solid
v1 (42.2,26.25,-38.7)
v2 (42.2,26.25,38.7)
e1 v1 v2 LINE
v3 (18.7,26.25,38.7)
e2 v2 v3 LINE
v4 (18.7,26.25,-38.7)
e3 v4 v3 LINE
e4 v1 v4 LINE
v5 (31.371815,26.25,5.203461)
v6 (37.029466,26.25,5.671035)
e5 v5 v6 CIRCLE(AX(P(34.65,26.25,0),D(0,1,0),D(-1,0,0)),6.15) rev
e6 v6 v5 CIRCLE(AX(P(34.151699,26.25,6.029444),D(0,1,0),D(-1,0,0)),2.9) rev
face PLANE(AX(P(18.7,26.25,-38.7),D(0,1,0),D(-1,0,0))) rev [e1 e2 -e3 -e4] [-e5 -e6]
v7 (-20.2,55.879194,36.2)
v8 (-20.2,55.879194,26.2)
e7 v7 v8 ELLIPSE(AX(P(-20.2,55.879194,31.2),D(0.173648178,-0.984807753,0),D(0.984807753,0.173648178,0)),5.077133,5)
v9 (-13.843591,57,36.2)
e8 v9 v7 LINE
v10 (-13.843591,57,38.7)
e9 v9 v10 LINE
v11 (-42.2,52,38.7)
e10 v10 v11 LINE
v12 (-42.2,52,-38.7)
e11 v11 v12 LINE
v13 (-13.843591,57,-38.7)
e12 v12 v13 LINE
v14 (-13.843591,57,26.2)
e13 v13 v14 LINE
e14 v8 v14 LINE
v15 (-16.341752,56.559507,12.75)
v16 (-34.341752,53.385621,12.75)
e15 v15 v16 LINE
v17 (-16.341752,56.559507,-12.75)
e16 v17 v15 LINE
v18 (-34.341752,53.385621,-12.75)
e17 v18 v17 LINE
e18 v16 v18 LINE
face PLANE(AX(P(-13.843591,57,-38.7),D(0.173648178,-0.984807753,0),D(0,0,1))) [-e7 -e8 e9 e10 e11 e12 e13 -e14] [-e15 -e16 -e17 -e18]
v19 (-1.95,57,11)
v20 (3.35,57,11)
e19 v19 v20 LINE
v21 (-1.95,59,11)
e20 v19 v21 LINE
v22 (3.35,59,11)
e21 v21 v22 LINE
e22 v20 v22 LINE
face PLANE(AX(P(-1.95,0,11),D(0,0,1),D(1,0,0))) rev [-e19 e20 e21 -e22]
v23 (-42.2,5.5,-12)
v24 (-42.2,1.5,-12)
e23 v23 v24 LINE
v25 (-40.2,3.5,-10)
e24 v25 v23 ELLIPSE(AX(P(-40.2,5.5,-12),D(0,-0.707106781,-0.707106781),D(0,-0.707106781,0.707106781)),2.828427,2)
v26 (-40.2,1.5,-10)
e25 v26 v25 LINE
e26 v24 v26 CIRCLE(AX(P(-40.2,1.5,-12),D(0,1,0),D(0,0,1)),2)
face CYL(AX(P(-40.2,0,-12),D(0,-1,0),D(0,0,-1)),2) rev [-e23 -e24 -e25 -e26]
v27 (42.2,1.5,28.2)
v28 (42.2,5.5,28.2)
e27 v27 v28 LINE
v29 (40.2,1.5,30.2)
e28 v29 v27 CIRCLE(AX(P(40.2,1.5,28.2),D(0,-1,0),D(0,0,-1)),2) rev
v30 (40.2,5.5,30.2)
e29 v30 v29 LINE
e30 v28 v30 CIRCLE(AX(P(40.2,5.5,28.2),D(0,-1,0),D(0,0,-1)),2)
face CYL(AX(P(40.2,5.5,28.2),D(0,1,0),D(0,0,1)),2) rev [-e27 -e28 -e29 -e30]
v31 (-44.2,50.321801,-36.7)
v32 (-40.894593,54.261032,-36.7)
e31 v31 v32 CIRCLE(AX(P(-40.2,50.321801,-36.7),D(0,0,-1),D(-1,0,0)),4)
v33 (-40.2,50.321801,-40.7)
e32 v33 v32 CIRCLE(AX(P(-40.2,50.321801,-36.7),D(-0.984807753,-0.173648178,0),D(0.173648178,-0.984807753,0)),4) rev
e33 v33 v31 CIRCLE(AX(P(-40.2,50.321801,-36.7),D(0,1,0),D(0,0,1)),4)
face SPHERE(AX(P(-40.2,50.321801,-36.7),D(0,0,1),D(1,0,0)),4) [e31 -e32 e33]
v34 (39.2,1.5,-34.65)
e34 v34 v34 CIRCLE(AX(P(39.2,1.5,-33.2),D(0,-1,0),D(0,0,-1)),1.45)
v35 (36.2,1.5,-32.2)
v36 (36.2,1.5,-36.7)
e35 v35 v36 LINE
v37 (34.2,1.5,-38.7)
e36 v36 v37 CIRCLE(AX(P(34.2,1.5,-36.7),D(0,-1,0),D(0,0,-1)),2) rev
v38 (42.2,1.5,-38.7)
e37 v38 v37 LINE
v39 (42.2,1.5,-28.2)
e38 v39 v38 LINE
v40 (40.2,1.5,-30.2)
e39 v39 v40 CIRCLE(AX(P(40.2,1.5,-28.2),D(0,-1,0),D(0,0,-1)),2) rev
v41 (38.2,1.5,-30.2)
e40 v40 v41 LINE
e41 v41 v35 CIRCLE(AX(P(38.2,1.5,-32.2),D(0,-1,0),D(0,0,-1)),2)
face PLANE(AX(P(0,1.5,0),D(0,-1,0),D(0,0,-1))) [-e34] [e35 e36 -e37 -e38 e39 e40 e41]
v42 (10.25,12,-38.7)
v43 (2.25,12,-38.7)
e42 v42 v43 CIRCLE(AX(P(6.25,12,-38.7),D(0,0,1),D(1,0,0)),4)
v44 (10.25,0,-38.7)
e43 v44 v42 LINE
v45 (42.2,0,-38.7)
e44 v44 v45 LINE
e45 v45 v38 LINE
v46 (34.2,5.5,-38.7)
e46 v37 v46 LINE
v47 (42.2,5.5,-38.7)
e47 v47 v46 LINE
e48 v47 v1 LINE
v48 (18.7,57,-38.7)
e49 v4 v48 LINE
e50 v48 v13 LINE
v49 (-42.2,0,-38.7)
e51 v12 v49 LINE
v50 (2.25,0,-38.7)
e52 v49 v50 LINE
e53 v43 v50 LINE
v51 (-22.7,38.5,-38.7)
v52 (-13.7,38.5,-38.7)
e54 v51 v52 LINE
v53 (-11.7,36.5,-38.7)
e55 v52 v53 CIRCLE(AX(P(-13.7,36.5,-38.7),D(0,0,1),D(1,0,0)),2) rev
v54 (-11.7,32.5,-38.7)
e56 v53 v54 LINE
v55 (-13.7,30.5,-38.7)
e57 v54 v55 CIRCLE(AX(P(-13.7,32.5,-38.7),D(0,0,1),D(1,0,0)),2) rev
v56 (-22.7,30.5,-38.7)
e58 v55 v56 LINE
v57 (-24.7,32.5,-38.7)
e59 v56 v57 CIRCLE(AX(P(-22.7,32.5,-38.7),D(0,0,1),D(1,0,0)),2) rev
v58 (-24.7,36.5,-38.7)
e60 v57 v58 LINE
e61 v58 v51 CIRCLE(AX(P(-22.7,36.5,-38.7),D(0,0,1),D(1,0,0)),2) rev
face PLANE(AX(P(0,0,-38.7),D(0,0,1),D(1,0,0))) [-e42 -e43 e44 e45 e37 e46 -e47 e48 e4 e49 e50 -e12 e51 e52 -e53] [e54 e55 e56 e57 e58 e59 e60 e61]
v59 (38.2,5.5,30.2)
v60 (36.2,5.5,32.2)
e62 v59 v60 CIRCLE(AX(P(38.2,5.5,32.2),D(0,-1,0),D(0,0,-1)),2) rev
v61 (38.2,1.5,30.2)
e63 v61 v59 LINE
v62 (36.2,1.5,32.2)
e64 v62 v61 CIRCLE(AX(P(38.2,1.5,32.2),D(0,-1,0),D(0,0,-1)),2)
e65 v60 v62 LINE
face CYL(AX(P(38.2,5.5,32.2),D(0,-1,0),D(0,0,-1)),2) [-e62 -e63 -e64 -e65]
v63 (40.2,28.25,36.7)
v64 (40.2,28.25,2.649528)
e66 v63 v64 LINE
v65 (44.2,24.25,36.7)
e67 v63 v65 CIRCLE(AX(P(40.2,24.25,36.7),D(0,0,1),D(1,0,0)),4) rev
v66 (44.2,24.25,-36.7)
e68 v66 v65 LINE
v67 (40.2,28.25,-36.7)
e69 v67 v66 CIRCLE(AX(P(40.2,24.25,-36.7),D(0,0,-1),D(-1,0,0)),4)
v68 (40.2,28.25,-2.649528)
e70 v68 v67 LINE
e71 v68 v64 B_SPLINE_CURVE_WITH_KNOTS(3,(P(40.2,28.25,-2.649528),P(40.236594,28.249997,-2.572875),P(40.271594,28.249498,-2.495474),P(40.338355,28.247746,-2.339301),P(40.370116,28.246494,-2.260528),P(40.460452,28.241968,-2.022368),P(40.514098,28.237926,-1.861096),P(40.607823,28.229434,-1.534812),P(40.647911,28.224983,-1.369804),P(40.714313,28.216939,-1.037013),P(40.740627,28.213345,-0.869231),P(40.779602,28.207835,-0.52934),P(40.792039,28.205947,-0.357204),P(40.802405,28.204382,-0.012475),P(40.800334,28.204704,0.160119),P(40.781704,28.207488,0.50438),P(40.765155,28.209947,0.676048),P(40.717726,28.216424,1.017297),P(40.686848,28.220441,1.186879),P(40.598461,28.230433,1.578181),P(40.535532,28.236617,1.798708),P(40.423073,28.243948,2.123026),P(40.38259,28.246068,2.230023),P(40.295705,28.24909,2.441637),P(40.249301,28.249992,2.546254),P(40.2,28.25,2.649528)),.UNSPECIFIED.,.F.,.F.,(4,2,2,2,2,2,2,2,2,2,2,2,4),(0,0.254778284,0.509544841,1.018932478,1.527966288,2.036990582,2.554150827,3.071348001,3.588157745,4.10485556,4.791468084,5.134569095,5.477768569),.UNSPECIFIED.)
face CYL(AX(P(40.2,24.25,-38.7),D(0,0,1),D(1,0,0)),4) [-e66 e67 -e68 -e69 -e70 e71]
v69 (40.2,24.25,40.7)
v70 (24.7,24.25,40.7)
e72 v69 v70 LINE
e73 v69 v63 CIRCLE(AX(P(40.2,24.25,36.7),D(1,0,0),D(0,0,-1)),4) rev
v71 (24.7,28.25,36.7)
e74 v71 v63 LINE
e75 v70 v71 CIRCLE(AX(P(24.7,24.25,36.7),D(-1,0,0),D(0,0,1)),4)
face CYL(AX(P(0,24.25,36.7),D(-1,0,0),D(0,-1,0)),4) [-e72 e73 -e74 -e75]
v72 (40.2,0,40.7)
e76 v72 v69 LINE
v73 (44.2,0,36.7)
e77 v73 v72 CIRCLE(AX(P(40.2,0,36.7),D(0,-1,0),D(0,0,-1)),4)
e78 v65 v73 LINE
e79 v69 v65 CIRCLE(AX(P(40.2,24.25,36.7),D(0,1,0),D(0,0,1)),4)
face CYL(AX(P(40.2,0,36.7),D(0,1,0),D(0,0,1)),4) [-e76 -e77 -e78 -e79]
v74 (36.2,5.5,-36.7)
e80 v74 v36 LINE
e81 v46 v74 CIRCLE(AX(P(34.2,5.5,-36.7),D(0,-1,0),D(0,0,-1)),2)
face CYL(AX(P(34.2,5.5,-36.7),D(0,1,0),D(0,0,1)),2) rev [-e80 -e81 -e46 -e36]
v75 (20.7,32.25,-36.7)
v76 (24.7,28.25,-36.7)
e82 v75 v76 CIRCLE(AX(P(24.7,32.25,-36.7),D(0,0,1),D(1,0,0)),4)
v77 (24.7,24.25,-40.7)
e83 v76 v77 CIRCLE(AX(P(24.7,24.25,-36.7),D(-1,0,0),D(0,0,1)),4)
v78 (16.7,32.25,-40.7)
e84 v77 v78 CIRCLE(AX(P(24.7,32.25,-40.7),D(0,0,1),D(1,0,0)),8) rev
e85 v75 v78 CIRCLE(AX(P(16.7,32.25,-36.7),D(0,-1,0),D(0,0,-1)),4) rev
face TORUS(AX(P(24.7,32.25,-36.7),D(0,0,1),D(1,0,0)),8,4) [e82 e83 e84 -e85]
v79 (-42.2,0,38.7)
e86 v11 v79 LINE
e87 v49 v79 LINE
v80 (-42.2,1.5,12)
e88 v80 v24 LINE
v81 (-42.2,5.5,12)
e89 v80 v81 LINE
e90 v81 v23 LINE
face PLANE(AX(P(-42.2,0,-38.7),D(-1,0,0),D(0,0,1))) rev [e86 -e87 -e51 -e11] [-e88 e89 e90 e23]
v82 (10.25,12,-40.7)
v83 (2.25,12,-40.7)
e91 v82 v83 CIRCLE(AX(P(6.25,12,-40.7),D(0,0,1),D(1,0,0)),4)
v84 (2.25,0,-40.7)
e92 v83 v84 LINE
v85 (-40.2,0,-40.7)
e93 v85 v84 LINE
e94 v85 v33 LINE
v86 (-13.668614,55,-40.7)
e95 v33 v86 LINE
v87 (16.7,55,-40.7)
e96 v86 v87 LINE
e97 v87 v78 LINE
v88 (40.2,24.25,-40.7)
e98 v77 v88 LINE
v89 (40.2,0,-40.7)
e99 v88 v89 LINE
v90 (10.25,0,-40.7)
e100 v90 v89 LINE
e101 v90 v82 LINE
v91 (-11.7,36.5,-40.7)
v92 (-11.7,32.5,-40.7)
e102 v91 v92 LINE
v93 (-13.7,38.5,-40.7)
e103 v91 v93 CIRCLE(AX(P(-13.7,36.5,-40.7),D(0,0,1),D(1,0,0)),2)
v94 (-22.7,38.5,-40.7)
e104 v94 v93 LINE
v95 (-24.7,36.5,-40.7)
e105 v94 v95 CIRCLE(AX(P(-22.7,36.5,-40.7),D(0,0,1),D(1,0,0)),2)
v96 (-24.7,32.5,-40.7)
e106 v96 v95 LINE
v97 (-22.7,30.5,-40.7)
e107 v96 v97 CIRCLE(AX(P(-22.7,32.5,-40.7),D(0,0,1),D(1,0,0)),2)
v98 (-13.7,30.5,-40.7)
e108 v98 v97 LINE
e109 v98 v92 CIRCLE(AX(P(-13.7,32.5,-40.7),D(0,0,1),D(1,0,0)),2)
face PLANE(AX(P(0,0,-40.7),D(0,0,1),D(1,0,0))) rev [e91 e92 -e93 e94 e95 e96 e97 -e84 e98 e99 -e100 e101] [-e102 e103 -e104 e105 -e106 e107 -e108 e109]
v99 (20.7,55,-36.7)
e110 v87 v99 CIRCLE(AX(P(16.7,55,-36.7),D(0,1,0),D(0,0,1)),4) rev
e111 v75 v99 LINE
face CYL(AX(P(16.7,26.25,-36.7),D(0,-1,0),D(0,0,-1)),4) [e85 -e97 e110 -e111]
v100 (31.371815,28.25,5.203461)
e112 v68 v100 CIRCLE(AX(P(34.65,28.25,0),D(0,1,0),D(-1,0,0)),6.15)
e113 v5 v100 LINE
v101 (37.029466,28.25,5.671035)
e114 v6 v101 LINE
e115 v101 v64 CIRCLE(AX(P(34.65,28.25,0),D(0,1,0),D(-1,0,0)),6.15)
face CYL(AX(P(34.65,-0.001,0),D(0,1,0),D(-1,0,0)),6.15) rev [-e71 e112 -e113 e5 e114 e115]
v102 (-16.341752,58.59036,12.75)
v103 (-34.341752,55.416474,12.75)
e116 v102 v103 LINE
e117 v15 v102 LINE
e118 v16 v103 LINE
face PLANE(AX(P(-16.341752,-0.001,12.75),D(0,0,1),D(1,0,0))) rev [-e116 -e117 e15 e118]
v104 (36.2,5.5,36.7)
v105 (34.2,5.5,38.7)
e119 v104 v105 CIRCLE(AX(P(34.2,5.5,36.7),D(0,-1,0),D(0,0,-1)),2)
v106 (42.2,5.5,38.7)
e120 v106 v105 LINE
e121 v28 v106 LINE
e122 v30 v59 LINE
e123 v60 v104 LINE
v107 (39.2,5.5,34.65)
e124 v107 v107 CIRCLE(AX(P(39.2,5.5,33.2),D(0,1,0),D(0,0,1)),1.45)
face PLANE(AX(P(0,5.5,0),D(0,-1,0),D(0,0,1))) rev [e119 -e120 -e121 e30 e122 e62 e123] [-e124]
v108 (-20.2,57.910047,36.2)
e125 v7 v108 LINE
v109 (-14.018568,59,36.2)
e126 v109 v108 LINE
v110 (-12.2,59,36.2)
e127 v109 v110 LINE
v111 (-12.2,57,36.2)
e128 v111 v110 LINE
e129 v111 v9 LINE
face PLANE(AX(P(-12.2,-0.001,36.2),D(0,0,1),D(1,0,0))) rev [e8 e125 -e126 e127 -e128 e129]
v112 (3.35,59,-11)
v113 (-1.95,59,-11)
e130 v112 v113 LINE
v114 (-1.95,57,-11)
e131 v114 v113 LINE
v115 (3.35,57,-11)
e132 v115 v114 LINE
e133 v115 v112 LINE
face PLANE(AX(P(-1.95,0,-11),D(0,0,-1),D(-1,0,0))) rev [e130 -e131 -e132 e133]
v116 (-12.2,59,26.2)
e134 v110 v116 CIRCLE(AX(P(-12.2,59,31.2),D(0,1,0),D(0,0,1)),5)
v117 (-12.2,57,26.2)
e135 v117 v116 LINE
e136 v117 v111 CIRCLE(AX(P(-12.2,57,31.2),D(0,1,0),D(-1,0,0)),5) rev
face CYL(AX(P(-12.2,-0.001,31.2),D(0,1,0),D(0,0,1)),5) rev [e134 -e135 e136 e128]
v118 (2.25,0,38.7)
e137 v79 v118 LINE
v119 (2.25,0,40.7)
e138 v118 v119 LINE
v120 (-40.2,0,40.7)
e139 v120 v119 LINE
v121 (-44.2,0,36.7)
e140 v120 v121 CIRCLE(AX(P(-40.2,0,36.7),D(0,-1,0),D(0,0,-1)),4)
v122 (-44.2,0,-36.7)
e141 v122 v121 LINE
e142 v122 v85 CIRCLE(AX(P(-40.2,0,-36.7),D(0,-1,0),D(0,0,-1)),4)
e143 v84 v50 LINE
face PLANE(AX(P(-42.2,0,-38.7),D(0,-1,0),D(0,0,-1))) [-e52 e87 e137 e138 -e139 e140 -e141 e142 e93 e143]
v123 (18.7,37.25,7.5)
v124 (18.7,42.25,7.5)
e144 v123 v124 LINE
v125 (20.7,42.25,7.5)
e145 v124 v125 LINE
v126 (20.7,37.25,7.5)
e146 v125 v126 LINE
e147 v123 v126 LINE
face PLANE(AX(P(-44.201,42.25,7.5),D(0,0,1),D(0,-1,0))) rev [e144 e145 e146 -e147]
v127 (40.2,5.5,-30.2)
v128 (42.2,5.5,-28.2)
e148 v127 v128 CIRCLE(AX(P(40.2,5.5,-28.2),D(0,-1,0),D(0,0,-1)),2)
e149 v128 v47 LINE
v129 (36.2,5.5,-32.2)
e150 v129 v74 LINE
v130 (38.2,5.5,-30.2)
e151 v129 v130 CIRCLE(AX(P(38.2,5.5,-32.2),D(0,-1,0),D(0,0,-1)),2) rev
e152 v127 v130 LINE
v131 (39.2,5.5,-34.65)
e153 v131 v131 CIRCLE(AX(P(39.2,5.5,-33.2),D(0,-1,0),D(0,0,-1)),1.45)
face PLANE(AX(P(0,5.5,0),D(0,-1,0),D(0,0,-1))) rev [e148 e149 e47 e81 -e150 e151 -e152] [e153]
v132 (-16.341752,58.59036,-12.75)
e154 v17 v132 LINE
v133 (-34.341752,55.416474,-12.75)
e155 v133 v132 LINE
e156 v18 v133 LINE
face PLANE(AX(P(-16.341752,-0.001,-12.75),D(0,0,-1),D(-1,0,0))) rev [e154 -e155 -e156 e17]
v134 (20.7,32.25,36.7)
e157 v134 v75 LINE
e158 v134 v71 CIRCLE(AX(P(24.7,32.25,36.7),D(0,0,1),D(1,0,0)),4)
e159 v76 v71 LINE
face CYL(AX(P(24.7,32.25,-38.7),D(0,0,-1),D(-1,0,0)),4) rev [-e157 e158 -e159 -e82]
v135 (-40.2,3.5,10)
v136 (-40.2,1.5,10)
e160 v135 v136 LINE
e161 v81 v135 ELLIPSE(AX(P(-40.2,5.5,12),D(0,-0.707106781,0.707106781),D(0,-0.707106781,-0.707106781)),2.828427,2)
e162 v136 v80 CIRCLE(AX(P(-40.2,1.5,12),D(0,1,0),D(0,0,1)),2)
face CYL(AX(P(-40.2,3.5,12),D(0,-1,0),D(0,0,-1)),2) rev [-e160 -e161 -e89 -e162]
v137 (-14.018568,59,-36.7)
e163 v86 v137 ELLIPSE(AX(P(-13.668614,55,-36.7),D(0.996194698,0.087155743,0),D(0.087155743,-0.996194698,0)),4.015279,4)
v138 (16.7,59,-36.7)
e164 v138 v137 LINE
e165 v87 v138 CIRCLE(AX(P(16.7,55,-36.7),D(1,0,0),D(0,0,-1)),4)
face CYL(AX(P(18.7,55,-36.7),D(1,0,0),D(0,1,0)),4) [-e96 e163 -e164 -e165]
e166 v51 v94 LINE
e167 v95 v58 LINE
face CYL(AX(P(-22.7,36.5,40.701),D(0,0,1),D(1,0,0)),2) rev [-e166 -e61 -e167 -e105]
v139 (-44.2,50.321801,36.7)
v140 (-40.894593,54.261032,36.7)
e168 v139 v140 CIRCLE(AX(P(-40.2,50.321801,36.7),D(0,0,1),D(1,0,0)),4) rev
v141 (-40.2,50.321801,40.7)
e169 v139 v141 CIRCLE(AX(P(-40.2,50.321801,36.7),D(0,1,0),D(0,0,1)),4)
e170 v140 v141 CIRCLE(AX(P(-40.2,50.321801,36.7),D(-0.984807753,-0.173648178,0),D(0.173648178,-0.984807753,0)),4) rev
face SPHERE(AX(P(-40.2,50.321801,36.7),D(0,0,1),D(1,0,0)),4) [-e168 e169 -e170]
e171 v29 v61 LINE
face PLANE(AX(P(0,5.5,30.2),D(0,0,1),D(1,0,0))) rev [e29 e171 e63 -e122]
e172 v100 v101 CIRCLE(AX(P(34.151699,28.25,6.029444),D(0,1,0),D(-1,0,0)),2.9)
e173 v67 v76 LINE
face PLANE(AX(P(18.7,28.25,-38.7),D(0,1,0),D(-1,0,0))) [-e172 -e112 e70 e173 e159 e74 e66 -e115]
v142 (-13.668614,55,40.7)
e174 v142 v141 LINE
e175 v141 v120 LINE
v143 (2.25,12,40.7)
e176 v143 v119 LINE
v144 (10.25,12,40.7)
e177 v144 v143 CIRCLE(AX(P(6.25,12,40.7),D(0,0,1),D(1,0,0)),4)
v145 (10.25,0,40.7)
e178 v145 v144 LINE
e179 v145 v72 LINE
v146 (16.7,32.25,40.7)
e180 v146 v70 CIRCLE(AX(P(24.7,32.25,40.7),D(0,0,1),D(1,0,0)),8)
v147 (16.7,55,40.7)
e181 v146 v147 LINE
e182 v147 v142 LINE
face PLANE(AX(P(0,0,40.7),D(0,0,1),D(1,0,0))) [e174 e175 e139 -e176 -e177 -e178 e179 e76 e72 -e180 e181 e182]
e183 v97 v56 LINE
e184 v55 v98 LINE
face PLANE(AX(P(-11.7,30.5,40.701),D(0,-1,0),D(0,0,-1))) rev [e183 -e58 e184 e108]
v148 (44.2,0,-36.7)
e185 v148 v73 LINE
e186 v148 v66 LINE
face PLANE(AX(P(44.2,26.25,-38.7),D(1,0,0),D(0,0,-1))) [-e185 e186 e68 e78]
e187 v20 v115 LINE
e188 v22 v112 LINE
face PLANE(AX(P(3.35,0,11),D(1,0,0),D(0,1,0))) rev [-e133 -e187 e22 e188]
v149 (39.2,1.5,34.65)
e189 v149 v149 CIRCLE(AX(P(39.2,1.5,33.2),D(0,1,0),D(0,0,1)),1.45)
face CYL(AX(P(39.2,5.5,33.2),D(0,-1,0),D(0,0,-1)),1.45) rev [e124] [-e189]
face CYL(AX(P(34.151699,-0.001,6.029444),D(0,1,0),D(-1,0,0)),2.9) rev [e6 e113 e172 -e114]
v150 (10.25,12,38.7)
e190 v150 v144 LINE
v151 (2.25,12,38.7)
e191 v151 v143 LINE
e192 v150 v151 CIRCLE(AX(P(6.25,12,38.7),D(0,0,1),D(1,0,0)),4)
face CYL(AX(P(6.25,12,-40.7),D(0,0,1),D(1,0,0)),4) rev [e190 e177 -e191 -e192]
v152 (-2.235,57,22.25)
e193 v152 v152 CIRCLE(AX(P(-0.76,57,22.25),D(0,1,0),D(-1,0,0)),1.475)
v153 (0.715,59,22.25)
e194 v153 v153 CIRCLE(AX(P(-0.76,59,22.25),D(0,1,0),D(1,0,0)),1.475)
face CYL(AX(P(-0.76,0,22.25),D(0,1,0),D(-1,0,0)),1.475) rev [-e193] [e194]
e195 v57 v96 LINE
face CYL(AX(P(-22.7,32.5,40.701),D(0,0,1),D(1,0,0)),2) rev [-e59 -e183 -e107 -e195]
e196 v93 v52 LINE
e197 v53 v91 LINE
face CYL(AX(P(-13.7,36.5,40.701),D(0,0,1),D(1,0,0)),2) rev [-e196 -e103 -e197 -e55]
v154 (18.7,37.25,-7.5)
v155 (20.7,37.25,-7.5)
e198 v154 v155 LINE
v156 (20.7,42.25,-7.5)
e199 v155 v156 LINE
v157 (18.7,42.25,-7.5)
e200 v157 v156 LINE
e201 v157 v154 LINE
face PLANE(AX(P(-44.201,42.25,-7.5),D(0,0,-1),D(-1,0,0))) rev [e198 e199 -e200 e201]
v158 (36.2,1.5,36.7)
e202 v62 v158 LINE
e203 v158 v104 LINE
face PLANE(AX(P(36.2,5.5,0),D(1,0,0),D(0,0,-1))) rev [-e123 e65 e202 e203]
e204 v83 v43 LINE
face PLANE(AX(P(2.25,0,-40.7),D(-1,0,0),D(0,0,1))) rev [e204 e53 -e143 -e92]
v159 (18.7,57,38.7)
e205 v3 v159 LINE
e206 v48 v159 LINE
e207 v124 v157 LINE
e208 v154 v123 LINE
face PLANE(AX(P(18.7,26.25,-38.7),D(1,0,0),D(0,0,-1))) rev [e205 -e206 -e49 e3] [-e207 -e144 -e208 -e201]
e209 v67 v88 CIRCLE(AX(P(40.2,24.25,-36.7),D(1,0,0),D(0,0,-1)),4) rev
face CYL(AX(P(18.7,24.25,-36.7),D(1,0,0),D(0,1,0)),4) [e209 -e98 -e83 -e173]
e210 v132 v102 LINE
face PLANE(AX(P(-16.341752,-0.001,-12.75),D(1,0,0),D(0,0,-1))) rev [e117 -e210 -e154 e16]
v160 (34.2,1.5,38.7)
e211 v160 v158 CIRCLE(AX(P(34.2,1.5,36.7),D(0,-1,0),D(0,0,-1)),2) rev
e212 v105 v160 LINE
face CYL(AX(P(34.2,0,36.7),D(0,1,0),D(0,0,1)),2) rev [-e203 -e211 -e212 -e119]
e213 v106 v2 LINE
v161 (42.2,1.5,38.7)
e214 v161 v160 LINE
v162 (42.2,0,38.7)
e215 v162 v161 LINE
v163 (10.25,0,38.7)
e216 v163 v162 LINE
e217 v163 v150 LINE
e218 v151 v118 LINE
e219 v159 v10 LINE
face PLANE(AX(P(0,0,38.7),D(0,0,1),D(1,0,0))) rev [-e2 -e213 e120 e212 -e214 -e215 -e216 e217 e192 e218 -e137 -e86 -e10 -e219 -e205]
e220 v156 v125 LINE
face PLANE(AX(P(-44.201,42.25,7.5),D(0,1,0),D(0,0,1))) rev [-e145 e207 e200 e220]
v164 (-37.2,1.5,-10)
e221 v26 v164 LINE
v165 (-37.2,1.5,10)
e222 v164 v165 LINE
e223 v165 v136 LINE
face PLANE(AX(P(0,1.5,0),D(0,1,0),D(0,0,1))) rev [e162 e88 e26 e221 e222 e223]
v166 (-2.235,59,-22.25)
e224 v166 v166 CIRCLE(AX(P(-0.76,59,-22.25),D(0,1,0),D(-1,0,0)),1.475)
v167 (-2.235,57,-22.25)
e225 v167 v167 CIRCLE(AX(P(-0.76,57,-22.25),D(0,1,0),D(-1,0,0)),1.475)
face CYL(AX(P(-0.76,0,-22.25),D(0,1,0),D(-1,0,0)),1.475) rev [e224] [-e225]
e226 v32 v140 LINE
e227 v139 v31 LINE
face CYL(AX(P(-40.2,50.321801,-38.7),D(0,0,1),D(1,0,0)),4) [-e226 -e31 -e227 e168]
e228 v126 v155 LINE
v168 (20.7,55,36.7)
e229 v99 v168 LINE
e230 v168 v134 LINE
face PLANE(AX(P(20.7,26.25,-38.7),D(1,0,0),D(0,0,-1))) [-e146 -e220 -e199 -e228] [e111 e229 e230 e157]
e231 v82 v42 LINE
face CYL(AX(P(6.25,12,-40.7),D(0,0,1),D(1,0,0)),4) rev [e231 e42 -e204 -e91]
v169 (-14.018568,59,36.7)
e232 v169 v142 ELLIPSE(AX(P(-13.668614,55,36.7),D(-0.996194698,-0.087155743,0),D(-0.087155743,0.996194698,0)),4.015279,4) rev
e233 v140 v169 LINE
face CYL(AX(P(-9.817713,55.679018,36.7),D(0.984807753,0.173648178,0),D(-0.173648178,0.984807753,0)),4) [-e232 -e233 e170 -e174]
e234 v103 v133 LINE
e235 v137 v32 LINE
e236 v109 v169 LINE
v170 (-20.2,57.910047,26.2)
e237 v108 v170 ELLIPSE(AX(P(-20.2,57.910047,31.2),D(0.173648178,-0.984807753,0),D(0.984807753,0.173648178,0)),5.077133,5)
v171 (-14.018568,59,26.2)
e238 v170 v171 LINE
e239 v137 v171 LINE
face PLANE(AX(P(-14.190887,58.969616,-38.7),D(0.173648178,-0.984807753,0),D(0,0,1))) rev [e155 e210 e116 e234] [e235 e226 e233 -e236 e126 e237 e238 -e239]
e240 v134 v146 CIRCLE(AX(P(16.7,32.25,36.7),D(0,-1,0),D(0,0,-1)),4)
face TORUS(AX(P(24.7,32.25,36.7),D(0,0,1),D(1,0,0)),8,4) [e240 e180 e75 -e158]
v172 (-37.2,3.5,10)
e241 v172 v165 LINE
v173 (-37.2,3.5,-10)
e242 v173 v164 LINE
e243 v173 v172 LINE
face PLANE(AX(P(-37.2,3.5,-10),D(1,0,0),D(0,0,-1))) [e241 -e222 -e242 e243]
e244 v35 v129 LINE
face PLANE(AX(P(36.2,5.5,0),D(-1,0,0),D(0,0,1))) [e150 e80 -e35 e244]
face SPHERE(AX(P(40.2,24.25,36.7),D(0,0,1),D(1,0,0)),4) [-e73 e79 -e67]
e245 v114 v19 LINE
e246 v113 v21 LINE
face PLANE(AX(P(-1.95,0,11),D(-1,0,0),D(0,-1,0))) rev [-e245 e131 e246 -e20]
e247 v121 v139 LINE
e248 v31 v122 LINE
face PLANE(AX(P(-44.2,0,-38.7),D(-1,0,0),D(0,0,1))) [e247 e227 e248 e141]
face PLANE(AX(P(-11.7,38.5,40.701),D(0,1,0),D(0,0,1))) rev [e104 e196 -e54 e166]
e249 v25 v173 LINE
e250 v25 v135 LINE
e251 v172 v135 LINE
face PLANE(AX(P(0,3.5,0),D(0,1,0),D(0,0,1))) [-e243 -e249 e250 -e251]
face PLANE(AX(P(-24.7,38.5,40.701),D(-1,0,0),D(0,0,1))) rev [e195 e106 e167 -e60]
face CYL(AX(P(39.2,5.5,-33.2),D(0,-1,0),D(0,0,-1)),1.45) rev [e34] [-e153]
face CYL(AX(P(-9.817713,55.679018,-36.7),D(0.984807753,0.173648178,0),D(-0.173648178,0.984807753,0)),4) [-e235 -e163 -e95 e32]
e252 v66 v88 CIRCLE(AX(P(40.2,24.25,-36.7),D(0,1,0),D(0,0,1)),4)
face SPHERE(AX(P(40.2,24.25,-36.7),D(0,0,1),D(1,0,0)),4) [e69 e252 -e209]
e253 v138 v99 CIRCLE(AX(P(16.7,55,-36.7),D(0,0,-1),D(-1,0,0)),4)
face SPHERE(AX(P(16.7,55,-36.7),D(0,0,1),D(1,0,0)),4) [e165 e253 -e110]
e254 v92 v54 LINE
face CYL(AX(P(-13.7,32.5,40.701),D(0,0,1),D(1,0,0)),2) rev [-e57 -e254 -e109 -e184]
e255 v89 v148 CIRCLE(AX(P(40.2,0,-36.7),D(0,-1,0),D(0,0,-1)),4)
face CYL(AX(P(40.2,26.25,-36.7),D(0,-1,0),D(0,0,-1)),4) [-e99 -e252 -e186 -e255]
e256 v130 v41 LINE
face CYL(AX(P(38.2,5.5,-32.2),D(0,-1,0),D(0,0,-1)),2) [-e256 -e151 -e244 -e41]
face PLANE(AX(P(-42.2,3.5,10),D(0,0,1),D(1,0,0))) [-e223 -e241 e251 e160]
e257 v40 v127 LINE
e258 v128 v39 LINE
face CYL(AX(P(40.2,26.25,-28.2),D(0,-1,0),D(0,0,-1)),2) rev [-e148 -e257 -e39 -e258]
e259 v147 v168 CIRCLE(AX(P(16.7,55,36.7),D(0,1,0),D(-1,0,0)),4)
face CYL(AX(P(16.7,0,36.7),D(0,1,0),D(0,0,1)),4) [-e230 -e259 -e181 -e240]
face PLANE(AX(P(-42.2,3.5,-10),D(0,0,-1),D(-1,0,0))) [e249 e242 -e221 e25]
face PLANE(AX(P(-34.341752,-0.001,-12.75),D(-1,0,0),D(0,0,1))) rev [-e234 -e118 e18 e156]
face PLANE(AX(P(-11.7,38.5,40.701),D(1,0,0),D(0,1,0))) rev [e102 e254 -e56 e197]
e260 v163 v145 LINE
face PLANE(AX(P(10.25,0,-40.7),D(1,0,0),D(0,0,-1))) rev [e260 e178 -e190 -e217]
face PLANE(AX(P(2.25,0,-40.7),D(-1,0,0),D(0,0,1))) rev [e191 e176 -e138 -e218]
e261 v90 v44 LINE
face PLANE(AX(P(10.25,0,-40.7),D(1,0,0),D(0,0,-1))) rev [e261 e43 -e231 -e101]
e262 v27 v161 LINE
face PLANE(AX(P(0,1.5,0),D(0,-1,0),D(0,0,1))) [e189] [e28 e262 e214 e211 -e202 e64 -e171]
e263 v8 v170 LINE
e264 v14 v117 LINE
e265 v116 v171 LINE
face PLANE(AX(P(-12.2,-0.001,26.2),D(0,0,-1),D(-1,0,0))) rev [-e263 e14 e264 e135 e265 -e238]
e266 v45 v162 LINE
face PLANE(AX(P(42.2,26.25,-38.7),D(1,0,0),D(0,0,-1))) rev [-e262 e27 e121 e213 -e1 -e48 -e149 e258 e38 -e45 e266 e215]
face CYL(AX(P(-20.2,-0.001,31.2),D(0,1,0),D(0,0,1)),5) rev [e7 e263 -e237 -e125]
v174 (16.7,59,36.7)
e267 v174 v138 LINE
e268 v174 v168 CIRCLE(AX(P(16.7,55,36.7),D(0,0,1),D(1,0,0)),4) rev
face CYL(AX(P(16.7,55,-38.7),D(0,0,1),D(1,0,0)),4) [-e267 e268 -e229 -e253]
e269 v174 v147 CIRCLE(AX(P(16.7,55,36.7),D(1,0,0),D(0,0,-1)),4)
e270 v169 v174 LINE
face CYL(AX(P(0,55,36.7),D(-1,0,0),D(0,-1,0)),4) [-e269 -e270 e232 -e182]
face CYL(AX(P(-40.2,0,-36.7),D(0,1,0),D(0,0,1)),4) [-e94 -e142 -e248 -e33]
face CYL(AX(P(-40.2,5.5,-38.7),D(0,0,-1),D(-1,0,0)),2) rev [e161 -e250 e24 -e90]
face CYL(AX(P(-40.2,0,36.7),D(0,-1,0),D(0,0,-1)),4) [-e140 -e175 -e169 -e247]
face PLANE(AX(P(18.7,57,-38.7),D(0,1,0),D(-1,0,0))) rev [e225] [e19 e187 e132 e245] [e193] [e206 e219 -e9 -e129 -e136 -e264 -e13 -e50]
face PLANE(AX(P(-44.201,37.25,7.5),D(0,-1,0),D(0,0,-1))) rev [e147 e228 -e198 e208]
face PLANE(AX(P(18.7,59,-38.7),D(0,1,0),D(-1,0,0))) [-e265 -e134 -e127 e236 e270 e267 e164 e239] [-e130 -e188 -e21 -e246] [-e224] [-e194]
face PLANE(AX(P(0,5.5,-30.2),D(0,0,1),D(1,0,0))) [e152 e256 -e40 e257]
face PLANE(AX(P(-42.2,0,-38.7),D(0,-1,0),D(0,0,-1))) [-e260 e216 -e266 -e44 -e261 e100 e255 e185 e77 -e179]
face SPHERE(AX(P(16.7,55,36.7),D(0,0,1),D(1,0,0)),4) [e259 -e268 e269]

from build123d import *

# Parameters (mm, degrees)
BOSS_EXTRUDE1_DEPTH      = 38.7
BOSS_EXTRUDE1_DEPTH_BACK = 38.7
CHAMFER1_SIZE            = 5
CHAMFER1_SIZE2           = 28.356409098
SHELL1_T                 = 2
FILLET2_R                = 4
BOSS_EXTRUDE2_START      = -1.5
SKETCH2_W                = 6
SKETCH2_H                = 2.5
SKETCH2_H_2              = 6
SKETCH2_R                = 1.45
BOSS_EXTRUDE2_DEPTH      = 4
FILLET3_R                = 2
CUT_EXTRUDE1_REACH       = 69.496
SKETCH3_R                = 6.15
SKETCH3_R_2              = 2.9
BOSS_EXTRUDE3_START      = -1.5
SKETCH4_W                = 5
SKETCH4_H                = 20
BOSS_EXTRUDE3_DEPTH      = 2
FILLET4_R                = 2
CUT_EXTRUDE2_REACH       = 98.693
SKETCH5_W                = 15
SKETCH5_H                = 5
CUT_EXTRUDE3_DEPTH       = 110.820763104
CUT_EXTRUDE4_REACH       = 97
SKETCH7_W                = 18
SKETCH7_H                = 25.5
CUT_EXTRUDE5_REACH       = 86.209
CUT_EXTRUDE6_REACH       = 111.821
SKETCH10_W               = 13
SKETCH10_H               = 8
FILLET5_R                = 2
SKETCH11_W               = 5.3
SKETCH11_H               = 22
CUT_EXTRUDE7_DEPTH       = 85.208847569
SKETCH12_R               = 1.475
CUT_EXTRUDE8_DEPTH       = 85.208847569


with BuildPart() as part:
    # Sketch1 → Boss-Extrude1 (new, two sides: drawn at the far end of the back side and taken through both)
    with BuildSketch(Plane.XY.offset(-BOSS_EXTRUDE1_DEPTH_BACK)):
        Polygon((-42.2, 0), (42.2, 0), (42.2, 26.25), (18.7, 26.25), (18.7, 57), (-42.2, 57), align=None)
    extrude(amount=BOSS_EXTRUDE1_DEPTH + BOSS_EXTRUDE1_DEPTH_BACK)

    # Chamfer1
    chamfer1_edges = [part.edges().sort_by_distance(p)[0] for p in [
        (-42.2, 57, 0),
    ]]
    chamfer1_side = [part.faces().sort_by_distance(p)[0] for p in [
        (-42.2, 28.5, 0),
    ]]
    chamfer(chamfer1_edges, length=CHAMFER1_SIZE, length2=CHAMFER1_SIZE2, reference=chamfer1_side[0])

    # Shell1
    shell1_openings = [part.faces().sort_by_distance(p)[0] for p in [
        (0, 0, 0),
    ]]
    offset(amount=SHELL1_T, openings=shell1_openings, kind=Kind.INTERSECTION)

    # Fillet2
    # the kernel refuses this fillet: 4 mm, written as the material it adds along each edge
    with BuildSketch(Plane(origin=(20.7, 28.25, -40.7), x_dir=(0, 1, 0), z_dir=(0, 0, 1))) as fillet2_piece_1:
        with BuildLine():
            CenterArc((FILLET2_R, -FILLET2_R), FILLET2_R, 90, 90)
            Line((0, -FILLET2_R), (0, 0))
            Line((0, 0), (FILLET2_R, 0))
        make_face()
    extrude(amount=81.4)
    # the kernel refuses this fillet: 4 mm, written as the material it takes off along each edge
    with BuildSketch(Plane(origin=(-40.2, 50.321800738, 36.7), x_dir=(-0.1736481776669273, 0.9848077530122087, 0), z_dir=(0, 0, 1))) as fillet2_2_piece_1_section:
        Polygon((0, 0), (FILLET2_R, 0), (FILLET2_R, FILLET2_R * 0.839099631177), (FILLET2_R * 0.173648177667, FILLET2_R * 0.984807753012), align=None)
    fillet2_2_piece_1 = extrude(amount=FILLET2_R, mode=Mode.PRIVATE)
    fillet2_2_piece_1 = fillet2_2_piece_1 - Plane(origin=(-40.2, 50.321800738, 36.7), x_dir=(0.766044443118977, -0.6427876096865405, 0), z_dir=(0, 0, 1)) * Sphere(FILLET2_R, mode=Mode.PRIVATE)
    add(fillet2_2_piece_1, mode=Mode.SUBTRACT)
    with BuildSketch(Plane(origin=(-40.2, 50.321800738, -36.7), x_dir=(-0.1736481776669273, 0.9848077530122087, 0), z_dir=(0, 0, -1))) as fillet2_2_piece_2_section:
        Polygon((0, 0), (FILLET2_R, 0), (FILLET2_R, -FILLET2_R * 0.839099631177), (FILLET2_R * 0.173648177667, -FILLET2_R * 0.984807753012), align=None)
    fillet2_2_piece_2 = extrude(amount=FILLET2_R, mode=Mode.PRIVATE)
    fillet2_2_piece_2 = fillet2_2_piece_2 - Plane(origin=(-40.2, 50.321800738, -36.7), x_dir=(0.766044443118977, -0.6427876096865405, 0), z_dir=(0, 0, -1)) * Sphere(FILLET2_R, mode=Mode.PRIVATE)
    add(fillet2_2_piece_2, mode=Mode.SUBTRACT)
    with BuildSketch(Plane(origin=(20.7, 59, 50.7), x_dir=(0, -1, 0), z_dir=(0, 0, -1)), Plane(origin=(44.2, 28.25, 50.7), x_dir=(0, -1, 0), z_dir=(0, 0, -1))) as fillet2_2_piece_3:
        with BuildLine():
            CenterArc((FILLET2_R, FILLET2_R), FILLET2_R, 180, 90)
            Line((0, FILLET2_R), (0, 0))
            Line((0, 0), (FILLET2_R, 0))
        make_face()
    extrude(amount=101.4, mode=Mode.SUBTRACT)
    with BuildSketch(Plane(origin=(44.2, 38.25, -40.7), x_dir=(0, 0, 1), z_dir=(0, -1, 0))) as fillet2_2_piece_4:
        with BuildLine():
            CenterArc((FILLET2_R, FILLET2_R), FILLET2_R, 180, 90)
            Line((0, FILLET2_R), (0, 0))
            Line((0, 0), (FILLET2_R, 0))
        make_face()
    extrude(amount=48.25, mode=Mode.SUBTRACT)
    with BuildSketch(Plane(origin=(44.2, -10, 40.7), x_dir=(-1, 0, 0), z_dir=(0, 1, 0))) as fillet2_2_piece_5:
        with BuildLine():
            CenterArc((FILLET2_R, -FILLET2_R), FILLET2_R, 90, 90)
            Line((0, -FILLET2_R), (0, 0))
            Line((0, 0), (FILLET2_R, 0))
        make_face()
    extrude(amount=48.25, mode=Mode.SUBTRACT)
    with BuildSketch(Plane(origin=(30.7, 59, 40.7), x_dir=(0, -1, 0), z_dir=(-1, 0, 0)), Plane(origin=(-24.018568229, 59, -40.7), x_dir=(0, -1, 0), z_dir=(1, 0, 0))) as fillet2_2_piece_6:
        with BuildLine():
            CenterArc((FILLET2_R, -FILLET2_R), FILLET2_R, 90, 90)
            Line((0, -FILLET2_R), (0, 0))
            Line((0, 0), (FILLET2_R, 0))
        make_face()
    extrude(amount=54.718568229, mode=Mode.SUBTRACT)
    with BuildSketch(Plane(origin=(-44.2, 50.321800738, 40.7), x_dir=(0, 0, -1), z_dir=(0, -1, 0)), Plane(origin=(-44.2, -10, -40.7), x_dir=(0, 0, 1), z_dir=(0, 1, 0))) as fillet2_2_piece_7:
        with BuildLine():
            CenterArc((FILLET2_R, FILLET2_R), FILLET2_R, 180, 90)
            Line((0, FILLET2_R), (0, 0))
            Line((0, 0), (FILLET2_R, 0))
        make_face()
    extrude(amount=60.321800738, mode=Mode.SUBTRACT)
    with BuildSketch(Plane(origin=(-4.170490699, 60.736481777, 40.7), x_dir=(0.17364817766692728, -0.9848077530122086, 0), z_dir=(-0.9848077530122087, -0.1736481776669273, 0)), Plane(origin=(-40.894592711, 54.26103175, -40.7), x_dir=(0.1736481776669273, -0.9848077530122087, 1.77635683940025e-15), z_dir=(0.9848077530122087, 0.1736481776669273, 0))) as fillet2_2_piece_8:
        with BuildLine():
            CenterArc((FILLET2_R, -FILLET2_R), FILLET2_R, 90, 90)
            Line((0, -FILLET2_R), (0, 0))
            Line((0, 0), (FILLET2_R, 0))
        make_face()
    extrude(amount=37.29063048, mode=Mode.SUBTRACT)
    with BuildSketch(Plane(origin=(-44.2, 53.678199262, -36.7), x_dir=(0, -1, 0), z_dir=(0, 0, 1))) as fillet2_2_piece_9:
        with BuildLine():
            CenterArc((FILLET2_R * 0.839099631177, FILLET2_R), FILLET2_R, 190, 80)
            Line((-FILLET2_R * 0.145708121835, FILLET2_R * 0.826351822333), (0, 0))
            Line((0, 0), (FILLET2_R * 0.839099631177, 0))
        make_face()
    extrude(amount=73.4, mode=Mode.SUBTRACT)
    # the kernel refuses this fillet: 4 mm, written as the material it takes off along each edge
    with BuildSketch(Plane(origin=(16.7, 55, -36.7), x_dir=(1, 0, 0), z_dir=(0, 0, -1))) as fillet2_3_piece_1_section:
        Polygon((0, 0), (FILLET2_R, 0), (FILLET2_R, -FILLET2_R), (0, -FILLET2_R), align=None)
    fillet2_3_piece_1 = extrude(amount=FILLET2_R, mode=Mode.PRIVATE)
    fillet2_3_piece_1 = fillet2_3_piece_1 - Plane(origin=(16.7, 55, -36.7), x_dir=(-0.7071067811865475, -0.7071067811865476, 0), z_dir=(0, 0, -1)) * Sphere(FILLET2_R, mode=Mode.PRIVATE)
    add(fillet2_3_piece_1, mode=Mode.SUBTRACT)
    with BuildSketch(Plane(origin=(16.7, 55, 36.7), x_dir=(1, 0, 0), z_dir=(0, 0, 1))) as fillet2_3_piece_2_section:
        Polygon((0, 0), (FILLET2_R, 0), (FILLET2_R, FILLET2_R), (0, FILLET2_R), align=None)
    fillet2_3_piece_2 = extrude(amount=FILLET2_R, mode=Mode.PRIVATE)
    fillet2_3_piece_2 = fillet2_3_piece_2 - Plane(origin=(16.7, 55, 36.7), x_dir=(-0.7071067811865475, -0.7071067811865476, 0), z_dir=(0, 0, 1)) * Sphere(FILLET2_R, mode=Mode.PRIVATE)
    add(fillet2_3_piece_2, mode=Mode.SUBTRACT)
    with BuildSketch(Plane(origin=(40.2, 24.25, 36.7), x_dir=(0, 1, 0), z_dir=(0, 0, 1))) as fillet2_3_piece_3_section:
        Polygon((0, 0), (FILLET2_R, 0), (FILLET2_R, -FILLET2_R), (0, -FILLET2_R), align=None)
    fillet2_3_piece_3 = extrude(amount=FILLET2_R, mode=Mode.PRIVATE)
    fillet2_3_piece_3 = fillet2_3_piece_3 - Plane(origin=(40.2, 24.25, 36.7), x_dir=(-0.7071067811865475, -0.7071067811865476, 0), z_dir=(0, 0, 1)) * Sphere(FILLET2_R, mode=Mode.PRIVATE)
    add(fillet2_3_piece_3, mode=Mode.SUBTRACT)
    with BuildSketch(Plane(origin=(40.2, 24.25, -36.7), x_dir=(0, 1, 0), z_dir=(0, 0, -1))) as fillet2_3_piece_4_section:
        Polygon((0, 0), (FILLET2_R, 0), (FILLET2_R, FILLET2_R), (0, FILLET2_R), align=None)
    fillet2_3_piece_4 = extrude(amount=FILLET2_R, mode=Mode.PRIVATE)
    fillet2_3_piece_4 = fillet2_3_piece_4 - Plane(origin=(40.2, 24.25, -36.7), x_dir=(-0.7071067811865475, -0.7071067811865476, 0), z_dir=(0, 0, -1)) * Sphere(FILLET2_R, mode=Mode.PRIVATE)
    add(fillet2_3_piece_4, mode=Mode.SUBTRACT)
    with BuildSketch(Plane(origin=(24.7, 28.25, -40.7), x_dir=(0, -1, 0), z_dir=(1, 0, 0)), Plane(origin=(40.2, 28.25, 40.7), x_dir=(0, -1, 0), z_dir=(-1, 0, 0))) as fillet2_3_piece_5:
        with BuildLine():
            CenterArc((FILLET2_R, -FILLET2_R), FILLET2_R, 90, 90)
            Line((0, -FILLET2_R), (0, 0))
            Line((0, 0), (FILLET2_R, 0))
        make_face()
    extrude(amount=15.5, mode=Mode.SUBTRACT)
    with BuildSketch(Plane(origin=(20.7, 32.25, 40.7), x_dir=(-1, 0, 0), z_dir=(0, 1, 0)), Plane(origin=(20.7, 55, -40.7), x_dir=(-1, 0, 0), z_dir=(0, -1, 0))) as fillet2_3_piece_6:
        with BuildLine():
            CenterArc((FILLET2_R, -FILLET2_R), FILLET2_R, 90, 90)
            Line((0, -FILLET2_R), (0, 0))
            Line((0, 0), (FILLET2_R, 0))
        make_face()
    extrude(amount=22.75, mode=Mode.SUBTRACT)
    with BuildSketch(Plane(origin=(24.7, 32.25, -40.7), x_dir=(-1, 0, 0), z_dir=(0, 1, 0))) as fillet2_3_piece_7:
        with BuildLine():
            CenterArc((4 + FILLET2_R, FILLET2_R), FILLET2_R, 180, 90)
            Line((4, FILLET2_R), (4, 0))
            Line((4, 0), (4 + FILLET2_R, 0))
        make_face()
    revolve(axis=Axis((24.7, 32.25, -40.7), (0, 0, 1)), revolution_arc=90, mode=Mode.SUBTRACT)
    with BuildSketch(Plane(origin=(24.7, 32.25, 40.7), x_dir=(-1, 0, 0), z_dir=(0, 1, 0))) as fillet2_3_piece_8:
        with BuildLine():
            CenterArc((4 + FILLET2_R, -FILLET2_R), FILLET2_R, 90, 90)
            Line((4, -FILLET2_R), (4, 0))
            Line((4, 0), (4 + FILLET2_R, 0))
        make_face()
    revolve(axis=Axis((24.7, 32.25, 40.7), (0, 0, 1)), revolution_arc=90, mode=Mode.SUBTRACT)

    # Sketch2 → Boss-Extrude2 (add)
    # profile 1 of 2: a face of its own
    with BuildSketch(Plane.XZ.offset(BOSS_EXTRUDE2_START)):
        with Locations((39.2, -37.45)):
            Rectangle(SKETCH2_W, SKETCH2_H)
    # profile 2 of 2: a face of its own
    with BuildSketch(Plane.XZ.offset(BOSS_EXTRUDE2_START)):
        with Locations((39.2, -33.2)):
            Rectangle(SKETCH2_W, SKETCH2_H_2)
        with Locations(Location((39.2, -33.2, 0), (0, 0, 270))):
            Circle(SKETCH2_R, mode=Mode.SUBTRACT)
    boss_extrude2 = extrude(amount=-BOSS_EXTRUDE2_DEPTH)

    # Mirror1: Boss-Extrude2 across plane
    add(boss_extrude2.mirror(Plane.XY))

    # Fillet3
    fillet3_edges = [part.edges().sort_by_distance(p)[0] for p in [
        (42.2, 3.5, -30.2),
        (36.2, 3.5, -38.7),
        (36.2, 3.5, -30.2),
        (42.2, 3.5, 30.2),
        (36.2, 3.5, 30.2),
        (36.2, 3.5, 38.7),
    ]]
    fillet(fillet3_edges, radius=FILLET3_R)

    # Sketch3 → Cut-Extrude1 (cut, up to next)
    with BuildSketch(Plane(origin=(0, 28.25, 0), x_dir=(1, 0, 0), z_dir=(0, 1, 0)), mode=Mode.PRIVATE) as cut_extrude1_sk1:
        with Locations((34.65, 0)):
            Circle(SKETCH3_R)
    cut_extrude1_tool1 = extrude(cut_extrude1_sk1.sketch, amount=-CUT_EXTRUDE1_REACH, mode=Mode.PRIVATE) & part.part
    # Sketch3 → Cut-Extrude1 (cut, up to next)
    with BuildSketch(Plane(origin=(0, 28.25, 0), x_dir=(1, 0, 0), z_dir=(0, 1, 0)), mode=Mode.PRIVATE) as cut_extrude1_sk2:
        with Locations((34.151698836, -6.029444083)):
            Circle(SKETCH3_R_2)
    cut_extrude1_tool2 = extrude(cut_extrude1_sk2.sketch, amount=-CUT_EXTRUDE1_REACH, mode=Mode.PRIVATE) & part.part
    add(cut_extrude1_tool1.solids().sort_by_distance((34.65, 28.25, 0))[0], mode=Mode.SUBTRACT)
    add(cut_extrude1_tool2.solids().sort_by_distance((34.151699, 28.25, 6.029444))[0], mode=Mode.SUBTRACT)

    # Sketch4 → Boss-Extrude3 (add)
    with BuildSketch(Plane.XZ.offset(BOSS_EXTRUDE3_START)):
        with Locations((-39.7, 0)):
            Rectangle(SKETCH4_W, SKETCH4_H)
    extrude(amount=-BOSS_EXTRUDE3_DEPTH)

    # Fillet4
    fillet4_edges = [part.edges().sort_by_distance(p)[0] for p in [
        (-42.2, 3.5, 0),
        (-42.2, 2.5, -10),
        (-42.2, 2.5, 10),
    ]]
    fillet(fillet4_edges, radius=FILLET4_R)

    # Sketch5 → Cut-Extrude2 (cut, up to next)
    with BuildSketch(Plane(origin=(20.7, 0, 0), x_dir=(0, 0, -1), z_dir=(1, 0, 0)), mode=Mode.PRIVATE) as cut_extrude2_sk1:
        with Locations((0, 39.75)):
            Rectangle(SKETCH5_W, SKETCH5_H)
    cut_extrude2_tool1 = extrude(cut_extrude2_sk1.sketch, amount=-CUT_EXTRUDE2_REACH, mode=Mode.PRIVATE) & part.part
    add(cut_extrude2_tool1.solids().sort_by_distance((20.7, 39.75, 0))[0], mode=Mode.SUBTRACT)

    # Sketch6 → Cut-Extrude3 (cut, through all)
    with BuildSketch(Plane.XY.offset(40.7)):
        with BuildLine():
            Line((2.25, 0), (2.25, 12))
            ThreePointArc((2.25, 12), (6.25, 16), (10.25, 12))
            Line((10.25, 12), (10.25, 0))
            ThreePointArc((10.25, 0), (6.25, -4), (2.25, 0))
        make_face()
    extrude(amount=-CUT_EXTRUDE3_DEPTH, mode=Mode.SUBTRACT)

    # Cut-Extrude4: up to this plane
    cut_extrude4_end = Plane(origin=(-13.843590902, 57, -38.7), z_dir=(0.17364817766693122, -0.9848077530122079, 0))
    # Sketch7 → Cut-Extrude4 (cut, up to the surface)
    with BuildSketch(Plane(origin=(-18.150298314, 59, 0), x_dir=(1, 0, 0), z_dir=(0, 1, 0)), mode=Mode.PRIVATE) as cut_extrude4_sk1:
        with Locations((-7.191454162, 0)):
            Rectangle(SKETCH7_W, SKETCH7_H)
    cut_extrude4_tool1 = split(extrude(cut_extrude4_sk1.sketch, amount=-CUT_EXTRUDE4_REACH, mode=Mode.PRIVATE), bisect_by=cut_extrude4_end, keep=Keep.BOTH, mode=Mode.PRIVATE)
    add(cut_extrude4_tool1.solids().sort_by_distance((-25.341752, 59, 0))[0], mode=Mode.SUBTRACT)

    # Sketch8 → Cut-Extrude5 (cut, up to next)
    with BuildSketch(Plane(origin=(0, 59, 0), x_dir=(1, 0, 0), z_dir=(0, 1, 0)), mode=Mode.PRIVATE) as cut_extrude5_sk1:
        with BuildLine():
            Line((-12.2, -36.2), (-20.2, -36.2))
            ThreePointArc((-20.2, -36.2), (-25.2, -31.2), (-20.2, -26.2))
            Line((-20.2, -26.2), (-12.2, -26.2))
            ThreePointArc((-12.2, -26.2), (-7.2, -31.2), (-12.2, -36.2))
        make_face()
    cut_extrude5_tool1 = extrude(cut_extrude5_sk1.sketch, amount=-CUT_EXTRUDE5_REACH, mode=Mode.PRIVATE) & part.part
    add(cut_extrude5_tool1.solids().sort_by_distance((-16.2, 59, 31.2))[0], mode=Mode.SUBTRACT)

    # Sketch10 → Cut-Extrude6 (cut, up to next)
    with BuildSketch(Plane(origin=(0, 0, -40.7), x_dir=(-1, 0, 0), z_dir=(0, 0, -1)), mode=Mode.PRIVATE) as cut_extrude6_sk1:
        with Locations((18.2, 34.5)):
            Rectangle(SKETCH10_W, SKETCH10_H)
    cut_extrude6_tool1 = extrude(cut_extrude6_sk1.sketch, amount=-CUT_EXTRUDE6_REACH, mode=Mode.PRIVATE) & part.part
    add(cut_extrude6_tool1.solids().sort_by_distance((-18.2, 34.5, -40.7))[0], mode=Mode.SUBTRACT)

    # Fillet5
    fillet5_edges = [part.edges().sort_by_distance(p)[0] for p in [
        (-24.7, 38.5, -39.7),
        (-24.7, 30.5, -39.7),
        (-11.7, 30.5, -39.7),
        (-11.7, 38.5, -39.7),
    ]]
    fillet(fillet5_edges, radius=FILLET5_R)

    # Sketch11 → Cut-Extrude7 (cut, through all)
    with BuildSketch(Plane(origin=(0, 59, 0), x_dir=(1, 0, 0), z_dir=(0, 1, 0))):
        with Locations((0.7, 0)):
            Rectangle(SKETCH11_W, SKETCH11_H)
    extrude(amount=-CUT_EXTRUDE7_DEPTH, mode=Mode.SUBTRACT)

    # Sketch12 → Cut-Extrude8 (cut, through all)
    with BuildSketch(Plane(origin=(0, 59, 0), x_dir=(1, 0, 0), z_dir=(0, 1, 0))):
        with Locations(Location((-0.76, 22.25, 0), (0, 0, 180))):
            Circle(SKETCH12_R)
        with Locations(Location((-0.76, -22.25, 0), (0, 0, 180))):
            Circle(SKETCH12_R)
    extrude(amount=-CUT_EXTRUDE8_DEPTH, mode=Mode.SUBTRACT)


solid = part.part
